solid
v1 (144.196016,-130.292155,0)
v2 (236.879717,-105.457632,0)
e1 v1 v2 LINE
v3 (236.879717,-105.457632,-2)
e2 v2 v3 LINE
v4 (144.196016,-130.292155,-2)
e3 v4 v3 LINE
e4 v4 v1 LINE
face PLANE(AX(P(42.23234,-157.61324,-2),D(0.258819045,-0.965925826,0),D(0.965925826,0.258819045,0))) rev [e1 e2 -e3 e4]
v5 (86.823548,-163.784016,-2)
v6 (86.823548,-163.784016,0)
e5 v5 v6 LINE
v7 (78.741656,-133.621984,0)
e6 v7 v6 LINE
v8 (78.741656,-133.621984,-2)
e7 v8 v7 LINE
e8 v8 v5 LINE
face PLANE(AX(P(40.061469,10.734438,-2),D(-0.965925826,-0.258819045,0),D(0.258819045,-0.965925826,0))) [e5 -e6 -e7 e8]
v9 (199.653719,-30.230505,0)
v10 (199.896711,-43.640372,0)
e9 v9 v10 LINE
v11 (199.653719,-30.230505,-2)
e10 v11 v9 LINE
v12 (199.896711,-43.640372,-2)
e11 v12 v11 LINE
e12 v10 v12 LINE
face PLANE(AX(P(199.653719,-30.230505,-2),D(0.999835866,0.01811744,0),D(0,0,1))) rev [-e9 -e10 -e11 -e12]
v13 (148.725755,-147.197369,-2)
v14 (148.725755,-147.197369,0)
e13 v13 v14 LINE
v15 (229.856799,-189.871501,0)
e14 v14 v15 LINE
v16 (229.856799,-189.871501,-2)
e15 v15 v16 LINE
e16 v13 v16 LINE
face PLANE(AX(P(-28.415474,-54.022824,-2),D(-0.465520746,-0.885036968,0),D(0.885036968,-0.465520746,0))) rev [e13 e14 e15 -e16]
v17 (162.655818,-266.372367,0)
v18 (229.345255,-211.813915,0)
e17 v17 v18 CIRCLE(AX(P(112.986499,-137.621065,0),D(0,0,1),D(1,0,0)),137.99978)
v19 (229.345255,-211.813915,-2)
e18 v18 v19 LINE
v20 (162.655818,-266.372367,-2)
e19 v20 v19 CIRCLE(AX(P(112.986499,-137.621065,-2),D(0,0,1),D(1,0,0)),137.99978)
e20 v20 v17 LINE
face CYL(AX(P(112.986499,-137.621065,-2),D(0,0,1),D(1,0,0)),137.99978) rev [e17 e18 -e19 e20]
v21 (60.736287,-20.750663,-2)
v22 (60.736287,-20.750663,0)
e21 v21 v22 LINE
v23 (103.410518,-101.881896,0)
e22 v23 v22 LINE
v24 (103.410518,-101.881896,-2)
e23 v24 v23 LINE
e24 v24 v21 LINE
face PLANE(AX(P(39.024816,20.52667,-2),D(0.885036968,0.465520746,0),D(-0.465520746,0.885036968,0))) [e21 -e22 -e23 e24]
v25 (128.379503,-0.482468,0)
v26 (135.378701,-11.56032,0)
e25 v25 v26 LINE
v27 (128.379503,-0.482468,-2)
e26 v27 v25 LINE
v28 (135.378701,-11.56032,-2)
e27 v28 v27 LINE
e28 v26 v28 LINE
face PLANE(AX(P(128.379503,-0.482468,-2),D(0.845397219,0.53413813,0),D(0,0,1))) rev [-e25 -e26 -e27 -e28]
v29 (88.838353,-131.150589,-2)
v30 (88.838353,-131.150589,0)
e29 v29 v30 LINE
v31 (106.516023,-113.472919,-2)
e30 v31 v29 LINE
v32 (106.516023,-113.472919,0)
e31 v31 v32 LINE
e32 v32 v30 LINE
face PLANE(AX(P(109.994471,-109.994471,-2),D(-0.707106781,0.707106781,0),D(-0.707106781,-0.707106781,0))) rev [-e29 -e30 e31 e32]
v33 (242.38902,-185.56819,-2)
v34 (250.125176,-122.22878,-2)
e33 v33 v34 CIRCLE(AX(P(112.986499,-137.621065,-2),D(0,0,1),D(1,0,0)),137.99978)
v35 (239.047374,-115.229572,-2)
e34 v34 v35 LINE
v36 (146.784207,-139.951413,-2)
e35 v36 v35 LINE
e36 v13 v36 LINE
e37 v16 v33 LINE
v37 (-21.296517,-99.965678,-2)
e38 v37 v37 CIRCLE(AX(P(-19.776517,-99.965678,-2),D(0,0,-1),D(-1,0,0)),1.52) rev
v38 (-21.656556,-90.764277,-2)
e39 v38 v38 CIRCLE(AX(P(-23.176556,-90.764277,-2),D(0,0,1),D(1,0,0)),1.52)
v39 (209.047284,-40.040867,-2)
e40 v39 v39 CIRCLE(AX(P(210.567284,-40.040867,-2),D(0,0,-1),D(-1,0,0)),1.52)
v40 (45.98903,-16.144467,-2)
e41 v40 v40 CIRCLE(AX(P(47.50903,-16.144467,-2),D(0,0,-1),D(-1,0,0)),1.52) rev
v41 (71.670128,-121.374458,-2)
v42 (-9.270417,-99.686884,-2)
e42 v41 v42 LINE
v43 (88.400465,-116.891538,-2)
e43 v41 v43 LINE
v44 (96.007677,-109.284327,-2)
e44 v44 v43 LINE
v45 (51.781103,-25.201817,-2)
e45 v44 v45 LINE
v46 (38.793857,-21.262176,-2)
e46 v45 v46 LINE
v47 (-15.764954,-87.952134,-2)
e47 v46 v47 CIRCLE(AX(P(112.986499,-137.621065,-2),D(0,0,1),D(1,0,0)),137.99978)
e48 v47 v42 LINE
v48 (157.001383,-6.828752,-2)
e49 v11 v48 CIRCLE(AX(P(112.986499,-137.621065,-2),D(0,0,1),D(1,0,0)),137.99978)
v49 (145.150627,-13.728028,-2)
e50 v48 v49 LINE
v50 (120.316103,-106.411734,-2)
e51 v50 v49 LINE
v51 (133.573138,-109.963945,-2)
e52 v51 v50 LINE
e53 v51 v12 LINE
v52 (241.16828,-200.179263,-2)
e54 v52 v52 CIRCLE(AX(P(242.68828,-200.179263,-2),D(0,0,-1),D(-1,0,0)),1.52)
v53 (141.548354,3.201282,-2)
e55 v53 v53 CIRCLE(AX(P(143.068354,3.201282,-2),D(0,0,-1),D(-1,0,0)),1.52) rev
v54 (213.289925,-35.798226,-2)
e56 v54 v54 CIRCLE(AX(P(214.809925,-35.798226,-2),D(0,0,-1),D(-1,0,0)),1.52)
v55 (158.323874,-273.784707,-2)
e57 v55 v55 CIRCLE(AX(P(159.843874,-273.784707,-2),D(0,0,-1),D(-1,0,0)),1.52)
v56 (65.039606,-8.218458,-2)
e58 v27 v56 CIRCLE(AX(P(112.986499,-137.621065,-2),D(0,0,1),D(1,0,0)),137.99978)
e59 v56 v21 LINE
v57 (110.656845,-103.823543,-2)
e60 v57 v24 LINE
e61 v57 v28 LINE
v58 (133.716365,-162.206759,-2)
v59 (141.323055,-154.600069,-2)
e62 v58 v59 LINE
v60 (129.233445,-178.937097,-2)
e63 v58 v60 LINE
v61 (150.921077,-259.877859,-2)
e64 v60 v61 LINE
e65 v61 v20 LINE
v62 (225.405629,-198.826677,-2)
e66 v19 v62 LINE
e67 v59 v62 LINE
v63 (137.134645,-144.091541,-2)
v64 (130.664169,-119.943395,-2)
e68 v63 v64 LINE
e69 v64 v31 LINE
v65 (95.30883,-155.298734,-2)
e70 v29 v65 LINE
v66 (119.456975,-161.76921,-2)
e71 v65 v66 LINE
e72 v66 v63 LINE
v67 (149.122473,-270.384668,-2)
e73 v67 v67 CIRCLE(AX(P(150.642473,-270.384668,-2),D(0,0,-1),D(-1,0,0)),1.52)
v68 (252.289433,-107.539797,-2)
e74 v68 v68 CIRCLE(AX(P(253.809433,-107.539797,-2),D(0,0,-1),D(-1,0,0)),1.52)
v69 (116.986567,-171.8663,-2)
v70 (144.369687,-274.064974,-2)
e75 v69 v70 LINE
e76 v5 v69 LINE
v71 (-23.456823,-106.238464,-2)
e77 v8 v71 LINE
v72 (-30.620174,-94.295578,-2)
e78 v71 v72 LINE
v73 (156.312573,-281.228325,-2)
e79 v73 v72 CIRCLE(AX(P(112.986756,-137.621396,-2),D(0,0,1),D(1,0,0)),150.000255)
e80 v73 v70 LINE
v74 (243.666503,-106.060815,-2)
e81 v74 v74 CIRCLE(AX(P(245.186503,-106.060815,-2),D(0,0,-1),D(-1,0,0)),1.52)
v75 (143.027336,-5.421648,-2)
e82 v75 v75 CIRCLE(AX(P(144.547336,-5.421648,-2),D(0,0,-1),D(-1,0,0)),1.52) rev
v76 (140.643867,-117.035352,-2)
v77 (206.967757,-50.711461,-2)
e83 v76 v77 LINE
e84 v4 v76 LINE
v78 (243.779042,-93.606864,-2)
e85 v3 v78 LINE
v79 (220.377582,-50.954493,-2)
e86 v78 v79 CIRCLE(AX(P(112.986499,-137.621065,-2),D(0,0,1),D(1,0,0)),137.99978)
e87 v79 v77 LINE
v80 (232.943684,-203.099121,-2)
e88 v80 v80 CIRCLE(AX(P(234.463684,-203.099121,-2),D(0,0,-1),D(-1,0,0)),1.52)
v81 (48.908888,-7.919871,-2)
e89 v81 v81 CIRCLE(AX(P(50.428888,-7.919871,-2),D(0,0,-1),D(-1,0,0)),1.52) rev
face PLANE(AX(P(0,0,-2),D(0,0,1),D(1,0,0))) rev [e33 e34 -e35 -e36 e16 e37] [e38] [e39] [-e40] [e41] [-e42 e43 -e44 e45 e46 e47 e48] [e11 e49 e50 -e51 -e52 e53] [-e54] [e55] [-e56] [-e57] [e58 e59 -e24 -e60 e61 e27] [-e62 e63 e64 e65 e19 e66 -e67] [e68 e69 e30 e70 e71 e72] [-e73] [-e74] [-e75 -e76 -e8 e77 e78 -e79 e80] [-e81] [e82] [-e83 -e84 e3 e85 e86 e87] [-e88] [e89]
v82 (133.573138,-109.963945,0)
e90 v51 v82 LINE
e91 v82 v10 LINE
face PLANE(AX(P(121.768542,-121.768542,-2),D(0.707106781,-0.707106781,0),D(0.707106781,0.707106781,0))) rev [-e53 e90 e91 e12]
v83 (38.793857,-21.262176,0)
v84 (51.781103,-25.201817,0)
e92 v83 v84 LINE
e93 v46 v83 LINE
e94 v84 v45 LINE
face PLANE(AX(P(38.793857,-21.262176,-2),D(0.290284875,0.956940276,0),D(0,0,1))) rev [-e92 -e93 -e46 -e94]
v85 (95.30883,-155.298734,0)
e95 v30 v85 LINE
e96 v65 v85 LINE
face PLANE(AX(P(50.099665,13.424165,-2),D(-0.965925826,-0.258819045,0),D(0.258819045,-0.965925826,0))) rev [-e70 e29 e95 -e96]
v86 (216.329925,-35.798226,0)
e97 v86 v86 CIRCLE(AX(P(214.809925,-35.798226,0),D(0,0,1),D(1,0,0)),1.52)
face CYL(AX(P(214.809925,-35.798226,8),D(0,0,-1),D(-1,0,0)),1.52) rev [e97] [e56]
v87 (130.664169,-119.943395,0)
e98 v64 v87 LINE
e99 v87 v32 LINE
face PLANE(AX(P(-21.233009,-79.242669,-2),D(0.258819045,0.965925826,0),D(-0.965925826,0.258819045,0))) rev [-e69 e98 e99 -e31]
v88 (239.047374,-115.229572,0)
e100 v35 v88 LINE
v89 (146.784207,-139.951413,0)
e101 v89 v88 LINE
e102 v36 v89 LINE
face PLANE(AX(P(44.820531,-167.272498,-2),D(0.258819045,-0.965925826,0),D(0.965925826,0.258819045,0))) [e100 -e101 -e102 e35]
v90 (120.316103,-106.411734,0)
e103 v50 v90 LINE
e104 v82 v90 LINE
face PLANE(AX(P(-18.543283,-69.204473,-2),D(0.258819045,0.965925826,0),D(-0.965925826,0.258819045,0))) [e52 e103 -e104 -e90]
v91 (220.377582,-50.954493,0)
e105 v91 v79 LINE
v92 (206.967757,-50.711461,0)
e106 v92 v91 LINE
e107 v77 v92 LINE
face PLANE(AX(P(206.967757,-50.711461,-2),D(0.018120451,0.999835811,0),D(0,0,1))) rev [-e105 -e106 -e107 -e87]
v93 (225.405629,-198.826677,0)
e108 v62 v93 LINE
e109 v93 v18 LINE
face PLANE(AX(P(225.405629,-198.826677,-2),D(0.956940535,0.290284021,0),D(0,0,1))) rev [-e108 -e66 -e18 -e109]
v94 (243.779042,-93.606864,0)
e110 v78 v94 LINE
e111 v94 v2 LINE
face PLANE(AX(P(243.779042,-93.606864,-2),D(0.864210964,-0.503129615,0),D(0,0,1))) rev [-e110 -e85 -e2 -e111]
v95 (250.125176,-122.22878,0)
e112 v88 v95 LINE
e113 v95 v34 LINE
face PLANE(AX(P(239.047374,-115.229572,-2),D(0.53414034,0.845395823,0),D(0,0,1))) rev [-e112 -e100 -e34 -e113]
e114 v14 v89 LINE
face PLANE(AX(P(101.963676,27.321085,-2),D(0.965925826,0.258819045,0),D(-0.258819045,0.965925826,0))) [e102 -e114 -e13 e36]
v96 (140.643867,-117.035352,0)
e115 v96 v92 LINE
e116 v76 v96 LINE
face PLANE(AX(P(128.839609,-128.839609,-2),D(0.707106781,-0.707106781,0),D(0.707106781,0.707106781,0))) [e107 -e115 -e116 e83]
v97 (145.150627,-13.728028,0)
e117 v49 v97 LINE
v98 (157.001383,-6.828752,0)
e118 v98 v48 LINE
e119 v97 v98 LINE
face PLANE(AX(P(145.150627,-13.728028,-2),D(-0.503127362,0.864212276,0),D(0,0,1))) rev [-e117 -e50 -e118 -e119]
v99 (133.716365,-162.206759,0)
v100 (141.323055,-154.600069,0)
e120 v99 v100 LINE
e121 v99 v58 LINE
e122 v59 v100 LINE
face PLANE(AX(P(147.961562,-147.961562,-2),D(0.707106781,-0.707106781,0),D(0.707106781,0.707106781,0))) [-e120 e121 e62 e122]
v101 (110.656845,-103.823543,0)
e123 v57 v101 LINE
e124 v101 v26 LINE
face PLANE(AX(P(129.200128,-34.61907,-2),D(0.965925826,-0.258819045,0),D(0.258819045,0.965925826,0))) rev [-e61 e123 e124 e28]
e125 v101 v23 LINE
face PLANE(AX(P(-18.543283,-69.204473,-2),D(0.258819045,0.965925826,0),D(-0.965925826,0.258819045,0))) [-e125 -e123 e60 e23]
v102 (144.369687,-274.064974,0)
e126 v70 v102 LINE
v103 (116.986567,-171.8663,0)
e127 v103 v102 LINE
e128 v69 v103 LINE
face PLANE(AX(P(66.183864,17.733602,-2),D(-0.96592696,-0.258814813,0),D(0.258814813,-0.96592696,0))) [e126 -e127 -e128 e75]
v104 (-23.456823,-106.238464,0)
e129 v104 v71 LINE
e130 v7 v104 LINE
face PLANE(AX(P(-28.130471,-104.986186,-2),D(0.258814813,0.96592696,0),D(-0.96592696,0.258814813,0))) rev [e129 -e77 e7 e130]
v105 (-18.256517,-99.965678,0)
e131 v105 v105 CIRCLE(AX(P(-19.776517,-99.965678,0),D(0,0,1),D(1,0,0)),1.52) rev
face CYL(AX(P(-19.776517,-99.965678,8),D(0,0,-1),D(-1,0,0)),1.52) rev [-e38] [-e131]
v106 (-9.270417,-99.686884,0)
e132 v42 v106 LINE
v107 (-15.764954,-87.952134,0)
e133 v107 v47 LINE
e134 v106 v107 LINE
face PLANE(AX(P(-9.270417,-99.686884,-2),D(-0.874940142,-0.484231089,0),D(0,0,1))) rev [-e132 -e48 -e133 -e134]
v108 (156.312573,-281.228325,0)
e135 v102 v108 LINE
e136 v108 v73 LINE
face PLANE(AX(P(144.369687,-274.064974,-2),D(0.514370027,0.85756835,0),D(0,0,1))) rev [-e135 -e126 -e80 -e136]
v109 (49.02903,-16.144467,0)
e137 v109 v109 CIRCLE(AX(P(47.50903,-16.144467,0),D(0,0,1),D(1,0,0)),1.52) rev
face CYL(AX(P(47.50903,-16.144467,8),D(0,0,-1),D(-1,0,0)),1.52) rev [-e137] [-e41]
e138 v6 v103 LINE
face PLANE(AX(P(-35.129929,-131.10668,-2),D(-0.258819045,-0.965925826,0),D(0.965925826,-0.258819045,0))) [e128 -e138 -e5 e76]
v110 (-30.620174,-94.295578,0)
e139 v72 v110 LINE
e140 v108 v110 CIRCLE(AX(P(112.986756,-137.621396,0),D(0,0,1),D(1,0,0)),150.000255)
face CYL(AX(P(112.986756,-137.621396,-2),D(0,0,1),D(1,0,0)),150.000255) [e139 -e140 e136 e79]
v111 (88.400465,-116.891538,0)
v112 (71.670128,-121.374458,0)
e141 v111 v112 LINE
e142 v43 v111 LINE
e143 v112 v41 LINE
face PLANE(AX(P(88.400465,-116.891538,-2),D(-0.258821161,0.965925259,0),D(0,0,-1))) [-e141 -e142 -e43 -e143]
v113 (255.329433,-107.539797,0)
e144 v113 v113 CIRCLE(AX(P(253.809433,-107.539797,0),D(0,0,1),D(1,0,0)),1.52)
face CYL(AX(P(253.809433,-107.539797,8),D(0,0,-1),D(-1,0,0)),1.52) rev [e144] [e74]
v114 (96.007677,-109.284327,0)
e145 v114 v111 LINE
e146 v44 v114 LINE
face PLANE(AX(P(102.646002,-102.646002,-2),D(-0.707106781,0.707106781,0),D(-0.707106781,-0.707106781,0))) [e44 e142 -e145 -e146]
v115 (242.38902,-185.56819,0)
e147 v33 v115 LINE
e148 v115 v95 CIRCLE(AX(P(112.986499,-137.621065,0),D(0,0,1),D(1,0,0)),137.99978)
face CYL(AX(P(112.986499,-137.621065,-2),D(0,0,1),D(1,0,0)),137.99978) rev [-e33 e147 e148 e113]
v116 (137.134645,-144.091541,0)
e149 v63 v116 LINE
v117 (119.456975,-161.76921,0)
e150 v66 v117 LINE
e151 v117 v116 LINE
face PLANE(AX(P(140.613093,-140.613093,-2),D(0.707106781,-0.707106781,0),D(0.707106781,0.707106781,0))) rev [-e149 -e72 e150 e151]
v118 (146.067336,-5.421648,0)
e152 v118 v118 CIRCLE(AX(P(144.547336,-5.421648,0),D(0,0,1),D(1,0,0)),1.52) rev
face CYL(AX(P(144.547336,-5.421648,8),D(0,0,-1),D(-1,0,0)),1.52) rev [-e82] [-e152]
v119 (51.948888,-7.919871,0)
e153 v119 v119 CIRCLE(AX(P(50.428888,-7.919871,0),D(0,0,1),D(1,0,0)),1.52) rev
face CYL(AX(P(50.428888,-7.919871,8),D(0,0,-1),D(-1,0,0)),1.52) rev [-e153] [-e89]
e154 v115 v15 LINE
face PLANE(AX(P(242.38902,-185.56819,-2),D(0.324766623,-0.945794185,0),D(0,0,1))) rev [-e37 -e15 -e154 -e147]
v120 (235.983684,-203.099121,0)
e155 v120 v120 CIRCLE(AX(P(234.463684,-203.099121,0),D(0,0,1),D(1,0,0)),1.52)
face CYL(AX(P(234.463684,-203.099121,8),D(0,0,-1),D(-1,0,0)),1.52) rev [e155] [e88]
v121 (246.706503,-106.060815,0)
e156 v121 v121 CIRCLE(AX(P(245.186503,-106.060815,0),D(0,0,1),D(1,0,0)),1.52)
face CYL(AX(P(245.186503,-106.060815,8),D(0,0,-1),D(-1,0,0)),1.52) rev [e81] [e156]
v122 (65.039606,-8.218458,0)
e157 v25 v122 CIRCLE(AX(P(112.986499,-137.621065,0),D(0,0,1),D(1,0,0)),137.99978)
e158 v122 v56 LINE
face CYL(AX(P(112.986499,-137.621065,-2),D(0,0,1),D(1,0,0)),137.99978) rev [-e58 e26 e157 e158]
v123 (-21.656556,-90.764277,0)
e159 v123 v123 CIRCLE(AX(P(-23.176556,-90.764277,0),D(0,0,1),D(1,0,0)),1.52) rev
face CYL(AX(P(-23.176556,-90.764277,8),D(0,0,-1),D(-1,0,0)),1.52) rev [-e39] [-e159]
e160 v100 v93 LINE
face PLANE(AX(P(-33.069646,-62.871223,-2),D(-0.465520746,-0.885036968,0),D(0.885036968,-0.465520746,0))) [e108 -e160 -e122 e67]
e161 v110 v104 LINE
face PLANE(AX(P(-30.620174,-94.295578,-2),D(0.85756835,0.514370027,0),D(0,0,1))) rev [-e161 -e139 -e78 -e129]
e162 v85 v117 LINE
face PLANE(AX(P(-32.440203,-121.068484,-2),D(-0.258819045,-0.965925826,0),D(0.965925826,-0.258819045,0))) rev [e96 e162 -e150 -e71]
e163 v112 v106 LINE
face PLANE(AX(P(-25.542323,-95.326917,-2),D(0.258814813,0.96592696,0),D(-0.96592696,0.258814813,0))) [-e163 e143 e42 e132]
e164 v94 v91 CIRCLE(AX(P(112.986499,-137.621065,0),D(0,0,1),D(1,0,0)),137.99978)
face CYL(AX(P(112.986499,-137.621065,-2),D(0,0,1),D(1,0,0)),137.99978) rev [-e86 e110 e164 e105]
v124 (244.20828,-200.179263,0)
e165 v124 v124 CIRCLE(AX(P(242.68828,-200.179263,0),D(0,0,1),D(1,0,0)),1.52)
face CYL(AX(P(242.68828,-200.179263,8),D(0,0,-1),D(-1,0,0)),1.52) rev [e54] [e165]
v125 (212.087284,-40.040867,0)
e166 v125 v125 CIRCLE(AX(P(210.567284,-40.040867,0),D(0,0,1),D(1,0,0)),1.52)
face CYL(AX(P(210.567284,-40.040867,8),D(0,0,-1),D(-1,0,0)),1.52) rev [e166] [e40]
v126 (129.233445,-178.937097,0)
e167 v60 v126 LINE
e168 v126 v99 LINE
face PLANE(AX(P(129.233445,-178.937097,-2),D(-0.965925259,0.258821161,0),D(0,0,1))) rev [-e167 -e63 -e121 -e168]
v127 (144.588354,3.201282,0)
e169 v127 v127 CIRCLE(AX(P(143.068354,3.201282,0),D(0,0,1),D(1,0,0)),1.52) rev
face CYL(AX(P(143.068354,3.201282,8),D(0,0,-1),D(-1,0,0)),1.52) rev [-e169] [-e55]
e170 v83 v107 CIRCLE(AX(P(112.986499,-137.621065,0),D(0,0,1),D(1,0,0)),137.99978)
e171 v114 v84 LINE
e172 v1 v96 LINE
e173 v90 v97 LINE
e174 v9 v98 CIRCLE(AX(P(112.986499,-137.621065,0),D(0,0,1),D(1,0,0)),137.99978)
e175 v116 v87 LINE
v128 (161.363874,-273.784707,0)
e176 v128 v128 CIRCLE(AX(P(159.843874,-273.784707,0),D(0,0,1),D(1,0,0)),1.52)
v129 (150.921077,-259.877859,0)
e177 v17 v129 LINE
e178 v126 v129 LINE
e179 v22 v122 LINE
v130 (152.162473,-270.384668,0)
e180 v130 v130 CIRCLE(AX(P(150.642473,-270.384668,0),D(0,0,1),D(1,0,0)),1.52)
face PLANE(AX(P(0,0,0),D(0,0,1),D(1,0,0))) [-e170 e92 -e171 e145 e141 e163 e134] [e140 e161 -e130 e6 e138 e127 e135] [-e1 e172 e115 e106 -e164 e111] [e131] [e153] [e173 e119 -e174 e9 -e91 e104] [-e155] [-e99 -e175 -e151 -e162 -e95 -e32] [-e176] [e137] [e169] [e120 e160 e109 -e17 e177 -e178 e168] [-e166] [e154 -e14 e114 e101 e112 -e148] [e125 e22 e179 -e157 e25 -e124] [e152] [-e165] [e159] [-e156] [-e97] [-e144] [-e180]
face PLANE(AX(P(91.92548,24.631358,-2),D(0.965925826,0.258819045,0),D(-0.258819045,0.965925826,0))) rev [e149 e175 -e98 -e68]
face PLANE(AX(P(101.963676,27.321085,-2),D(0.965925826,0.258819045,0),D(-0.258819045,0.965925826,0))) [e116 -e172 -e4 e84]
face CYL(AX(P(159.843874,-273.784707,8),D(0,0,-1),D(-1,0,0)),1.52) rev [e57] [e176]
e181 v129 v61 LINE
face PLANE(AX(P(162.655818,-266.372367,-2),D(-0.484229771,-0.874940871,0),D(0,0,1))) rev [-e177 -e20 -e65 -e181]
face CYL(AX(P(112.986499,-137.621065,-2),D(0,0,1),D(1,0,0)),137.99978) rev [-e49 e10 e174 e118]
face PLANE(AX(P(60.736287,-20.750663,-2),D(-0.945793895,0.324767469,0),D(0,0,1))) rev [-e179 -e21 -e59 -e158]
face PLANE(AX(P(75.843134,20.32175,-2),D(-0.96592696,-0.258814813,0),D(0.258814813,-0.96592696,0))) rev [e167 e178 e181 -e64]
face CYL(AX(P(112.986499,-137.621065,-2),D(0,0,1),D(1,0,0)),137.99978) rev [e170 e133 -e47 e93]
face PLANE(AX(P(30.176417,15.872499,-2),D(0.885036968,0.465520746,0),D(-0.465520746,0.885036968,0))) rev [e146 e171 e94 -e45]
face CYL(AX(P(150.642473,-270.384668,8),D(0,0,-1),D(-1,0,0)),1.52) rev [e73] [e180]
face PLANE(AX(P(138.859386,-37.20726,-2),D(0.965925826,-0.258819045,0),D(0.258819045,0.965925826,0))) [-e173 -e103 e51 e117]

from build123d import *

# Parameters (mm, degrees)
EXTRUDE_11_DEPTH    = 2
CHAMFER_1_SIZE      = 10
CHAMFER_3_SIZE      = 10
SKETCH_4_R          = 1.52
CUT_EXTRUDE_1_DEPTH = 10


with BuildPart() as part:
    # 草图2 → 凸台-拉伸11 (new body)
    with BuildSketch(Plane.XY):
        with BuildLine():
            Line((116.986968716, -171.866279839), (116.986166566, -171.866494817))
            Line((116.986166566, -171.866494817), (146.957834859, -283.724244016))
            ThreePointArc((146.95783486, -283.724244021), (219.052953151, -31.555197901), (-33.116092969, -103.650316192))
            Line((-33.116092963, -103.650316193), (78.741656236, -133.621984487))
            Line((78.741656247, -133.621984484), (86.823548141, -163.784015655))
            Line((86.823548141, -163.784015655), (86.824011296, -163.784139757))
            Line((86.824011296, -163.784139757), (116.986968716, -171.866279839))
        make_face()
        Polygon((119.456975173, -161.769210408), (95.30929267, -155.298858383), (95.308829516, -155.298734281), (88.838353388, -131.150588624), (106.516022918, -113.472919094), (130.664168575, -119.943395221), (137.134644703, -144.091540879), align=None, mode=Mode.SUBTRACT)
        with BuildLine():
            Line((126.645296946, -169.277827092), (141.323054558, -154.60006948))
            Line((141.323054558, -154.60006948), (234.255998853, -203.48188474))
            ThreePointArc((234.255998853, -203.48188474), (200.365014055, -244.433677808), (153.509224986, -269.537128502))
            Line((153.509224986, -269.537128502), (126.645296946, -169.277827092))
        make_face(mode=Mode.SUBTRACT)
        with BuildLine():
            ThreePointArc((248.706632523, -112.641381763), (249.968706378, -154.348708565), (238.707168991, -194.526708951))
            Line((238.707168991, -194.526708951), (148.725754618, -147.19736942))
            Line((148.725754618, -147.19736942), (146.784206577, -139.951413486))
            Line((146.784206577, -139.951413486), (248.706632523, -112.641381763))
        make_face(mode=Mode.SUBTRACT)
        with BuildLine():
            ThreePointArc((-18.929686723, -97.098736021), (6.17383244, -50.2426152), (47.125895572, -16.351447355))
            Line((47.125895572, -16.351447355), (96.007676733, -109.284326822))
            Line((96.007676733, -109.284326822), (81.329397649, -123.962605906))
            Line((81.329397649, -123.962605906), (-18.929686723, -97.098736021))
        make_face(mode=Mode.SUBTRACT)
        with BuildLine():
            ThreePointArc((56.081079681, -11.900293037), (96.259335826, -0.638798731), (137.966891648, -1.901061882))
            Line((137.966891648, -1.901061882), (110.656845042, -103.823543372))
            Line((110.656845042, -103.823543372), (103.410518411, -101.881896003))
            Line((103.410518411, -101.881896003), (56.081079681, -11.900293037))
        make_face(mode=Mode.SUBTRACT)
        with BuildLine():
            ThreePointArc((147.738817906, -4.068769649), (179.372913634, -16.638491001), (206.967778767, -36.569304474))
            Line((206.967778767, -36.569304474), (133.573137745, -109.963945495))
            Line((133.573137745, -109.963945495), (120.316103305, -106.411733823))
            Line((120.316103305, -106.411733823), (147.738817906, -4.068769649))
        make_face(mode=Mode.SUBTRACT)
        with BuildLine():
            ThreePointArc((214.038825287, -43.640393577), (233.969445691, -71.235329731), (246.538975276, -102.869441968))
            Line((246.538975276, -102.869441968), (144.196016126, -130.292155223))
            Line((144.196016126, -130.292155223), (140.643866505, -117.03535236))
            Line((140.643866505, -117.03535236), (214.038825287, -43.640393577))
        make_face(mode=Mode.SUBTRACT)
    extrude(amount=-EXTRUDE_11_DEPTH)

    # 倒角1
    # the kernel refuses this chamfer: 10 mm, written as the material it adds along each edge
    with BuildSketch(Plane(origin=(246.538975276, -102.869441968, 0), x_dir=(-0.28555901452107074, 0.9583611267292487, 0), z_dir=(0, 0, -1))) as chamfer_1_piece_1:
        with BuildLine():
            Line((9.665018265, 0), (CHAMFER_1_SIZE * 0.0277867153721, -CHAMFER_1_SIZE * 0.999613874678))
            Line((CHAMFER_1_SIZE * 0.0277867153721, -CHAMFER_1_SIZE * 0.999613874678), (0, 0))
            ThreePointArc((0, 0), (4.969359021, 0.084571078), (9.665018265, 0))
        make_face()
    extrude(amount=2)
    with BuildSketch(Plane(origin=(214.038825287, -43.640393577, 0), x_dir=(-0.707106781186561, -0.707106781186534, 0), z_dir=(0, 0, -1))) as chamfer_1_piece_2:
        with BuildLine():
            Line((CHAMFER_1_SIZE, 0), (0.689672032, -9.65402706))
            ThreePointArc((0.689672032, -9.65402706), (0.269761539, -4.966357207), (0, 0))
            Line((0, 0), (CHAMFER_1_SIZE, 0))
        make_face()
    extrude(amount=2)
    with BuildSketch(Plane(origin=(238.707168991, -194.526708951, 0), x_dir=(0.38013608783902403, 0.9249305675143631, 0), z_dir=(0, 0, -1))) as chamfer_1_piece_3:
        with BuildLine():
            Line((9.685612303, 0), (CHAMFER_1_SIZE * 0.0941398773056, -CHAMFER_1_SIZE * 0.995558980423))
            Line((CHAMFER_1_SIZE * 0.0941398773056, -CHAMFER_1_SIZE * 0.995558980423), (0, 0))
            ThreePointArc((0, 0), (4.974727114, 0.084937068), (9.685612303, 0))
        make_face()
    extrude(amount=2)
    with BuildSketch(Plane(origin=(248.706632523, -112.641381763, 0), x_dir=(0.14636574749919642, -0.9892305433815727, 0), z_dir=(0, 0, -1))) as chamfer_1_piece_4:
        with BuildLine():
            Line((9.691773178, 0), (CHAMFER_1_SIZE * 0.114653249031, CHAMFER_1_SIZE * 0.99340557301))
            Line((CHAMFER_1_SIZE * 0.114653249031, CHAMFER_1_SIZE * 0.99340557301), (0, 0))
            ThreePointArc((0, 0), (4.976248684, -0.085046752), (9.691773178, 0))
        make_face()
    extrude(amount=2)
    with BuildSketch(Plane(origin=(206.967778767, -36.569304474, 0), x_dir=(-0.7556917941479319, 0.6549274099146253, 0), z_dir=(0, 0, -1))) as chamfer_1_piece_5:
        with BuildLine():
            Line((9.678628526, 0), (CHAMFER_1_SIZE * 0.0712511793936, -CHAMFER_1_SIZE * 0.997458404865))
            Line((CHAMFER_1_SIZE * 0.0712511793936, -CHAMFER_1_SIZE * 0.997458404865), (0, 0))
            ThreePointArc((0, 0), (4.972954578, 0.084812842), (9.678628526, 0))
        make_face()
    extrude(amount=2)
    with BuildSketch(Plane(origin=(147.738817906, -4.068769649, 0), x_dir=(0.9583596366559947, -0.28556401529007475, 0), z_dir=(0, 0, -1))) as chamfer_1_piece_6:
        with BuildLine():
            Line((9.665019928, 0), (CHAMFER_1_SIZE * 0.0277919314036, CHAMFER_1_SIZE * 0.999613729672))
            Line((CHAMFER_1_SIZE * 0.0277919314036, CHAMFER_1_SIZE * 0.999613729672), (0, 0))
            ThreePointArc((0, 0), (4.969359471, -0.084571108), (9.665019928, 0))
        make_face()
    extrude(amount=2)
    with BuildSketch(Plane(origin=(153.509224986, -269.537128502, 0), x_dir=(0.9450297338640432, 0.32698440652859245, 0), z_dir=(0, 0, -1))) as chamfer_1_piece_7:
        with BuildLine():
            Line((9.678629813, 0), (CHAMFER_1_SIZE * 0.071255359942, -CHAMFER_1_SIZE * 0.997458106228))
            Line((CHAMFER_1_SIZE * 0.071255359942, -CHAMFER_1_SIZE * 0.997458106228), (0, 0))
            ThreePointArc((0, 0), (4.972954909, 0.084812865), (9.678629813, 0))
        make_face()
    extrude(amount=2)
    with BuildSketch(Plane(origin=(234.255998853, -203.48188474, 0), x_dir=(-0.5077534832780394, -0.861502408713416, 0), z_dir=(0, 0, -1))) as chamfer_1_piece_8:
        with BuildLine():
            Line((9.671511766, 0), (CHAMFER_1_SIZE * 0.0483333592427, CHAMFER_1_SIZE * 0.998831260216))
            Line((CHAMFER_1_SIZE * 0.0483333592427, CHAMFER_1_SIZE * 0.998831260216), (0, 0))
            ThreePointArc((0, 0), (4.97109735, -0.08468637), (9.671511766, 0))
        make_face()
    extrude(amount=2)
    with BuildSketch(Plane(origin=(-18.929686723, -97.098736021, 0), x_dir=(0.32698155779507593, 0.9450307195334474, 0), z_dir=(0, 0, -1))) as chamfer_1_piece_9:
        with BuildLine():
            Line((9.678628888, 0), (CHAMFER_1_SIZE * 0.0712523531674, CHAMFER_1_SIZE * 0.997458321018))
            Line((CHAMFER_1_SIZE * 0.0712523531674, CHAMFER_1_SIZE * 0.997458321018), (0, 0))
            ThreePointArc((0, 0), (4.972954671, -0.084812848), (9.678628888, 0))
        make_face()
    extrude(amount=2)
    with BuildSketch(Plane(origin=(47.125895572, -16.351447355, 0), x_dir=(-0.8615033162863328, -0.5077519434011564, 0), z_dir=(0, 0, -1))) as chamfer_1_piece_10:
        with BuildLine():
            Line((9.671511206, 0), (CHAMFER_1_SIZE * 0.0483315739005, -CHAMFER_1_SIZE * 0.998831346607))
            Line((CHAMFER_1_SIZE * 0.0483315739005, -CHAMFER_1_SIZE * 0.998831346607), (0, 0))
            ThreePointArc((0, 0), (4.971097202, 0.08468636), (9.671511206, 0))
        make_face()
    extrude(amount=2)
    with BuildSketch(Plane(origin=(56.081079681, -11.900293037, 0), x_dir=(0.46552074617297745, -0.8850369680880875, 0), z_dir=(0, 0, -1))) as chamfer_1_piece_11:
        with BuildLine():
            Line((CHAMFER_1_SIZE, 0), (0.911819668, -9.642597213))
            ThreePointArc((0.911819668, -9.642597213), (0.383769224, -4.960629667), (0, 0))
            Line((0, 0), (CHAMFER_1_SIZE, 0))
        make_face()
    extrude(amount=2)
    with BuildSketch(Plane(origin=(137.966891648, -1.901061882, 0), x_dir=(-0.258819045102493, -0.9659258262890758, 0), z_dir=(0, 0, -1))) as chamfer_1_piece_12:
        with BuildLine():
            Line((CHAMFER_1_SIZE, 0), (1.111142712, 9.627865763))
            ThreePointArc((1.111142712, 9.627865763), (0.486031221, 4.953186227), (0, 0))
            Line((0, 0), (CHAMFER_1_SIZE, 0))
        make_face()
    extrude(amount=2)
    # the kernel refuses this chamfer: 10 mm, written as the material it takes off along each edge
    with BuildSketch(Plane(origin=(146.95783486, -283.724244018, 25.728190053), x_dir=(0.9662009253756813, 0.25779017010579985, 0), z_dir=(0, 0, -1))) as chamfer_1_2_piece_1:
        with BuildLine():
            Line((9.681979791, 0), (-CHAMFER_1_SIZE * 0.00106063647762, -CHAMFER_1_SIZE * 0.999999437516))
            Line((-CHAMFER_1_SIZE * 0.00106063647762, -CHAMFER_1_SIZE * 0.999999437516), (0, 0))
            ThreePointArc((0, 0), (4.980125863, 0.078072968), (9.681979791, 0))
        make_face()
    extrude(amount=53.456380107, mode=Mode.SUBTRACT)
    with BuildSketch(Plane(origin=(-33.116092966, -103.650316193, 25.728190053), x_dir=(0.25779017010579297, 0.966200925375683, 0), z_dir=(0, 0, -1))) as chamfer_1_2_piece_2:
        with BuildLine():
            Line((9.681979791, 0), (-CHAMFER_1_SIZE * 0.00106063647762, CHAMFER_1_SIZE * 0.999999437516))
            Line((-CHAMFER_1_SIZE * 0.00106063647762, CHAMFER_1_SIZE * 0.999999437516), (0, 0))
            ThreePointArc((0, 0), (4.980125863, -0.078072968), (9.681979791, 0))
        make_face()
    extrude(amount=53.456380107, mode=Mode.SUBTRACT)

    # 倒角3
    chamfer_3_edges = [part.edges().sort_by_distance(p)[0] for p in [
        (126.645296946, -169.277827092, -1),
        (81.329397649, -123.962605906, -1),
    ]]
    chamfer(chamfer_3_edges, length=CHAMFER_3_SIZE)

    # 草图4 → 切除-拉伸1 (cut)
    with BuildSketch(Plane(origin=(0, 0, -2), x_dir=(-1, 0, 0), z_dir=(0, 0, -1))):
        with Locations((-245.186502849, -106.060815296)):
            Circle(SKETCH_4_R)
        with Locations((-253.809433195, -107.539796629)):
            Circle(SKETCH_4_R)
        with Locations((-234.46368438, -203.099121031)):
            Circle(SKETCH_4_R)
        with Locations((-242.688279646, -200.179263146)):
            Circle(SKETCH_4_R)
        with Locations((-150.64247259, -270.384667581)):
            Circle(SKETCH_4_R)
        with Locations((-159.843873975, -273.784707323)):
            Circle(SKETCH_4_R)
        with Locations((-210.567284016, -40.040867037)):
            Circle(SKETCH_4_R)
        with Locations((-214.809924703, -35.79822635)):
            Circle(SKETCH_4_R)
        with Locations((-144.547335756, -5.421648203)):
            Circle(SKETCH_4_R)
        with Locations((-143.068354423, 3.201282143)):
            Circle(SKETCH_4_R)
        with Locations((-47.509030022, -16.144466672)):
            Circle(SKETCH_4_R)
        with Locations((-50.428887906, -7.919871406)):
            Circle(SKETCH_4_R)
        with Locations((19.776516528, -99.965678463)):
            Circle(SKETCH_4_R)
        with Locations(Location((23.176556271, -90.764277077, 0), (0, 0, 180))):
            Circle(SKETCH_4_R)
    extrude(amount=-CUT_EXTRUDE_1_DEPTH, mode=Mode.SUBTRACT)


solid = part.part
